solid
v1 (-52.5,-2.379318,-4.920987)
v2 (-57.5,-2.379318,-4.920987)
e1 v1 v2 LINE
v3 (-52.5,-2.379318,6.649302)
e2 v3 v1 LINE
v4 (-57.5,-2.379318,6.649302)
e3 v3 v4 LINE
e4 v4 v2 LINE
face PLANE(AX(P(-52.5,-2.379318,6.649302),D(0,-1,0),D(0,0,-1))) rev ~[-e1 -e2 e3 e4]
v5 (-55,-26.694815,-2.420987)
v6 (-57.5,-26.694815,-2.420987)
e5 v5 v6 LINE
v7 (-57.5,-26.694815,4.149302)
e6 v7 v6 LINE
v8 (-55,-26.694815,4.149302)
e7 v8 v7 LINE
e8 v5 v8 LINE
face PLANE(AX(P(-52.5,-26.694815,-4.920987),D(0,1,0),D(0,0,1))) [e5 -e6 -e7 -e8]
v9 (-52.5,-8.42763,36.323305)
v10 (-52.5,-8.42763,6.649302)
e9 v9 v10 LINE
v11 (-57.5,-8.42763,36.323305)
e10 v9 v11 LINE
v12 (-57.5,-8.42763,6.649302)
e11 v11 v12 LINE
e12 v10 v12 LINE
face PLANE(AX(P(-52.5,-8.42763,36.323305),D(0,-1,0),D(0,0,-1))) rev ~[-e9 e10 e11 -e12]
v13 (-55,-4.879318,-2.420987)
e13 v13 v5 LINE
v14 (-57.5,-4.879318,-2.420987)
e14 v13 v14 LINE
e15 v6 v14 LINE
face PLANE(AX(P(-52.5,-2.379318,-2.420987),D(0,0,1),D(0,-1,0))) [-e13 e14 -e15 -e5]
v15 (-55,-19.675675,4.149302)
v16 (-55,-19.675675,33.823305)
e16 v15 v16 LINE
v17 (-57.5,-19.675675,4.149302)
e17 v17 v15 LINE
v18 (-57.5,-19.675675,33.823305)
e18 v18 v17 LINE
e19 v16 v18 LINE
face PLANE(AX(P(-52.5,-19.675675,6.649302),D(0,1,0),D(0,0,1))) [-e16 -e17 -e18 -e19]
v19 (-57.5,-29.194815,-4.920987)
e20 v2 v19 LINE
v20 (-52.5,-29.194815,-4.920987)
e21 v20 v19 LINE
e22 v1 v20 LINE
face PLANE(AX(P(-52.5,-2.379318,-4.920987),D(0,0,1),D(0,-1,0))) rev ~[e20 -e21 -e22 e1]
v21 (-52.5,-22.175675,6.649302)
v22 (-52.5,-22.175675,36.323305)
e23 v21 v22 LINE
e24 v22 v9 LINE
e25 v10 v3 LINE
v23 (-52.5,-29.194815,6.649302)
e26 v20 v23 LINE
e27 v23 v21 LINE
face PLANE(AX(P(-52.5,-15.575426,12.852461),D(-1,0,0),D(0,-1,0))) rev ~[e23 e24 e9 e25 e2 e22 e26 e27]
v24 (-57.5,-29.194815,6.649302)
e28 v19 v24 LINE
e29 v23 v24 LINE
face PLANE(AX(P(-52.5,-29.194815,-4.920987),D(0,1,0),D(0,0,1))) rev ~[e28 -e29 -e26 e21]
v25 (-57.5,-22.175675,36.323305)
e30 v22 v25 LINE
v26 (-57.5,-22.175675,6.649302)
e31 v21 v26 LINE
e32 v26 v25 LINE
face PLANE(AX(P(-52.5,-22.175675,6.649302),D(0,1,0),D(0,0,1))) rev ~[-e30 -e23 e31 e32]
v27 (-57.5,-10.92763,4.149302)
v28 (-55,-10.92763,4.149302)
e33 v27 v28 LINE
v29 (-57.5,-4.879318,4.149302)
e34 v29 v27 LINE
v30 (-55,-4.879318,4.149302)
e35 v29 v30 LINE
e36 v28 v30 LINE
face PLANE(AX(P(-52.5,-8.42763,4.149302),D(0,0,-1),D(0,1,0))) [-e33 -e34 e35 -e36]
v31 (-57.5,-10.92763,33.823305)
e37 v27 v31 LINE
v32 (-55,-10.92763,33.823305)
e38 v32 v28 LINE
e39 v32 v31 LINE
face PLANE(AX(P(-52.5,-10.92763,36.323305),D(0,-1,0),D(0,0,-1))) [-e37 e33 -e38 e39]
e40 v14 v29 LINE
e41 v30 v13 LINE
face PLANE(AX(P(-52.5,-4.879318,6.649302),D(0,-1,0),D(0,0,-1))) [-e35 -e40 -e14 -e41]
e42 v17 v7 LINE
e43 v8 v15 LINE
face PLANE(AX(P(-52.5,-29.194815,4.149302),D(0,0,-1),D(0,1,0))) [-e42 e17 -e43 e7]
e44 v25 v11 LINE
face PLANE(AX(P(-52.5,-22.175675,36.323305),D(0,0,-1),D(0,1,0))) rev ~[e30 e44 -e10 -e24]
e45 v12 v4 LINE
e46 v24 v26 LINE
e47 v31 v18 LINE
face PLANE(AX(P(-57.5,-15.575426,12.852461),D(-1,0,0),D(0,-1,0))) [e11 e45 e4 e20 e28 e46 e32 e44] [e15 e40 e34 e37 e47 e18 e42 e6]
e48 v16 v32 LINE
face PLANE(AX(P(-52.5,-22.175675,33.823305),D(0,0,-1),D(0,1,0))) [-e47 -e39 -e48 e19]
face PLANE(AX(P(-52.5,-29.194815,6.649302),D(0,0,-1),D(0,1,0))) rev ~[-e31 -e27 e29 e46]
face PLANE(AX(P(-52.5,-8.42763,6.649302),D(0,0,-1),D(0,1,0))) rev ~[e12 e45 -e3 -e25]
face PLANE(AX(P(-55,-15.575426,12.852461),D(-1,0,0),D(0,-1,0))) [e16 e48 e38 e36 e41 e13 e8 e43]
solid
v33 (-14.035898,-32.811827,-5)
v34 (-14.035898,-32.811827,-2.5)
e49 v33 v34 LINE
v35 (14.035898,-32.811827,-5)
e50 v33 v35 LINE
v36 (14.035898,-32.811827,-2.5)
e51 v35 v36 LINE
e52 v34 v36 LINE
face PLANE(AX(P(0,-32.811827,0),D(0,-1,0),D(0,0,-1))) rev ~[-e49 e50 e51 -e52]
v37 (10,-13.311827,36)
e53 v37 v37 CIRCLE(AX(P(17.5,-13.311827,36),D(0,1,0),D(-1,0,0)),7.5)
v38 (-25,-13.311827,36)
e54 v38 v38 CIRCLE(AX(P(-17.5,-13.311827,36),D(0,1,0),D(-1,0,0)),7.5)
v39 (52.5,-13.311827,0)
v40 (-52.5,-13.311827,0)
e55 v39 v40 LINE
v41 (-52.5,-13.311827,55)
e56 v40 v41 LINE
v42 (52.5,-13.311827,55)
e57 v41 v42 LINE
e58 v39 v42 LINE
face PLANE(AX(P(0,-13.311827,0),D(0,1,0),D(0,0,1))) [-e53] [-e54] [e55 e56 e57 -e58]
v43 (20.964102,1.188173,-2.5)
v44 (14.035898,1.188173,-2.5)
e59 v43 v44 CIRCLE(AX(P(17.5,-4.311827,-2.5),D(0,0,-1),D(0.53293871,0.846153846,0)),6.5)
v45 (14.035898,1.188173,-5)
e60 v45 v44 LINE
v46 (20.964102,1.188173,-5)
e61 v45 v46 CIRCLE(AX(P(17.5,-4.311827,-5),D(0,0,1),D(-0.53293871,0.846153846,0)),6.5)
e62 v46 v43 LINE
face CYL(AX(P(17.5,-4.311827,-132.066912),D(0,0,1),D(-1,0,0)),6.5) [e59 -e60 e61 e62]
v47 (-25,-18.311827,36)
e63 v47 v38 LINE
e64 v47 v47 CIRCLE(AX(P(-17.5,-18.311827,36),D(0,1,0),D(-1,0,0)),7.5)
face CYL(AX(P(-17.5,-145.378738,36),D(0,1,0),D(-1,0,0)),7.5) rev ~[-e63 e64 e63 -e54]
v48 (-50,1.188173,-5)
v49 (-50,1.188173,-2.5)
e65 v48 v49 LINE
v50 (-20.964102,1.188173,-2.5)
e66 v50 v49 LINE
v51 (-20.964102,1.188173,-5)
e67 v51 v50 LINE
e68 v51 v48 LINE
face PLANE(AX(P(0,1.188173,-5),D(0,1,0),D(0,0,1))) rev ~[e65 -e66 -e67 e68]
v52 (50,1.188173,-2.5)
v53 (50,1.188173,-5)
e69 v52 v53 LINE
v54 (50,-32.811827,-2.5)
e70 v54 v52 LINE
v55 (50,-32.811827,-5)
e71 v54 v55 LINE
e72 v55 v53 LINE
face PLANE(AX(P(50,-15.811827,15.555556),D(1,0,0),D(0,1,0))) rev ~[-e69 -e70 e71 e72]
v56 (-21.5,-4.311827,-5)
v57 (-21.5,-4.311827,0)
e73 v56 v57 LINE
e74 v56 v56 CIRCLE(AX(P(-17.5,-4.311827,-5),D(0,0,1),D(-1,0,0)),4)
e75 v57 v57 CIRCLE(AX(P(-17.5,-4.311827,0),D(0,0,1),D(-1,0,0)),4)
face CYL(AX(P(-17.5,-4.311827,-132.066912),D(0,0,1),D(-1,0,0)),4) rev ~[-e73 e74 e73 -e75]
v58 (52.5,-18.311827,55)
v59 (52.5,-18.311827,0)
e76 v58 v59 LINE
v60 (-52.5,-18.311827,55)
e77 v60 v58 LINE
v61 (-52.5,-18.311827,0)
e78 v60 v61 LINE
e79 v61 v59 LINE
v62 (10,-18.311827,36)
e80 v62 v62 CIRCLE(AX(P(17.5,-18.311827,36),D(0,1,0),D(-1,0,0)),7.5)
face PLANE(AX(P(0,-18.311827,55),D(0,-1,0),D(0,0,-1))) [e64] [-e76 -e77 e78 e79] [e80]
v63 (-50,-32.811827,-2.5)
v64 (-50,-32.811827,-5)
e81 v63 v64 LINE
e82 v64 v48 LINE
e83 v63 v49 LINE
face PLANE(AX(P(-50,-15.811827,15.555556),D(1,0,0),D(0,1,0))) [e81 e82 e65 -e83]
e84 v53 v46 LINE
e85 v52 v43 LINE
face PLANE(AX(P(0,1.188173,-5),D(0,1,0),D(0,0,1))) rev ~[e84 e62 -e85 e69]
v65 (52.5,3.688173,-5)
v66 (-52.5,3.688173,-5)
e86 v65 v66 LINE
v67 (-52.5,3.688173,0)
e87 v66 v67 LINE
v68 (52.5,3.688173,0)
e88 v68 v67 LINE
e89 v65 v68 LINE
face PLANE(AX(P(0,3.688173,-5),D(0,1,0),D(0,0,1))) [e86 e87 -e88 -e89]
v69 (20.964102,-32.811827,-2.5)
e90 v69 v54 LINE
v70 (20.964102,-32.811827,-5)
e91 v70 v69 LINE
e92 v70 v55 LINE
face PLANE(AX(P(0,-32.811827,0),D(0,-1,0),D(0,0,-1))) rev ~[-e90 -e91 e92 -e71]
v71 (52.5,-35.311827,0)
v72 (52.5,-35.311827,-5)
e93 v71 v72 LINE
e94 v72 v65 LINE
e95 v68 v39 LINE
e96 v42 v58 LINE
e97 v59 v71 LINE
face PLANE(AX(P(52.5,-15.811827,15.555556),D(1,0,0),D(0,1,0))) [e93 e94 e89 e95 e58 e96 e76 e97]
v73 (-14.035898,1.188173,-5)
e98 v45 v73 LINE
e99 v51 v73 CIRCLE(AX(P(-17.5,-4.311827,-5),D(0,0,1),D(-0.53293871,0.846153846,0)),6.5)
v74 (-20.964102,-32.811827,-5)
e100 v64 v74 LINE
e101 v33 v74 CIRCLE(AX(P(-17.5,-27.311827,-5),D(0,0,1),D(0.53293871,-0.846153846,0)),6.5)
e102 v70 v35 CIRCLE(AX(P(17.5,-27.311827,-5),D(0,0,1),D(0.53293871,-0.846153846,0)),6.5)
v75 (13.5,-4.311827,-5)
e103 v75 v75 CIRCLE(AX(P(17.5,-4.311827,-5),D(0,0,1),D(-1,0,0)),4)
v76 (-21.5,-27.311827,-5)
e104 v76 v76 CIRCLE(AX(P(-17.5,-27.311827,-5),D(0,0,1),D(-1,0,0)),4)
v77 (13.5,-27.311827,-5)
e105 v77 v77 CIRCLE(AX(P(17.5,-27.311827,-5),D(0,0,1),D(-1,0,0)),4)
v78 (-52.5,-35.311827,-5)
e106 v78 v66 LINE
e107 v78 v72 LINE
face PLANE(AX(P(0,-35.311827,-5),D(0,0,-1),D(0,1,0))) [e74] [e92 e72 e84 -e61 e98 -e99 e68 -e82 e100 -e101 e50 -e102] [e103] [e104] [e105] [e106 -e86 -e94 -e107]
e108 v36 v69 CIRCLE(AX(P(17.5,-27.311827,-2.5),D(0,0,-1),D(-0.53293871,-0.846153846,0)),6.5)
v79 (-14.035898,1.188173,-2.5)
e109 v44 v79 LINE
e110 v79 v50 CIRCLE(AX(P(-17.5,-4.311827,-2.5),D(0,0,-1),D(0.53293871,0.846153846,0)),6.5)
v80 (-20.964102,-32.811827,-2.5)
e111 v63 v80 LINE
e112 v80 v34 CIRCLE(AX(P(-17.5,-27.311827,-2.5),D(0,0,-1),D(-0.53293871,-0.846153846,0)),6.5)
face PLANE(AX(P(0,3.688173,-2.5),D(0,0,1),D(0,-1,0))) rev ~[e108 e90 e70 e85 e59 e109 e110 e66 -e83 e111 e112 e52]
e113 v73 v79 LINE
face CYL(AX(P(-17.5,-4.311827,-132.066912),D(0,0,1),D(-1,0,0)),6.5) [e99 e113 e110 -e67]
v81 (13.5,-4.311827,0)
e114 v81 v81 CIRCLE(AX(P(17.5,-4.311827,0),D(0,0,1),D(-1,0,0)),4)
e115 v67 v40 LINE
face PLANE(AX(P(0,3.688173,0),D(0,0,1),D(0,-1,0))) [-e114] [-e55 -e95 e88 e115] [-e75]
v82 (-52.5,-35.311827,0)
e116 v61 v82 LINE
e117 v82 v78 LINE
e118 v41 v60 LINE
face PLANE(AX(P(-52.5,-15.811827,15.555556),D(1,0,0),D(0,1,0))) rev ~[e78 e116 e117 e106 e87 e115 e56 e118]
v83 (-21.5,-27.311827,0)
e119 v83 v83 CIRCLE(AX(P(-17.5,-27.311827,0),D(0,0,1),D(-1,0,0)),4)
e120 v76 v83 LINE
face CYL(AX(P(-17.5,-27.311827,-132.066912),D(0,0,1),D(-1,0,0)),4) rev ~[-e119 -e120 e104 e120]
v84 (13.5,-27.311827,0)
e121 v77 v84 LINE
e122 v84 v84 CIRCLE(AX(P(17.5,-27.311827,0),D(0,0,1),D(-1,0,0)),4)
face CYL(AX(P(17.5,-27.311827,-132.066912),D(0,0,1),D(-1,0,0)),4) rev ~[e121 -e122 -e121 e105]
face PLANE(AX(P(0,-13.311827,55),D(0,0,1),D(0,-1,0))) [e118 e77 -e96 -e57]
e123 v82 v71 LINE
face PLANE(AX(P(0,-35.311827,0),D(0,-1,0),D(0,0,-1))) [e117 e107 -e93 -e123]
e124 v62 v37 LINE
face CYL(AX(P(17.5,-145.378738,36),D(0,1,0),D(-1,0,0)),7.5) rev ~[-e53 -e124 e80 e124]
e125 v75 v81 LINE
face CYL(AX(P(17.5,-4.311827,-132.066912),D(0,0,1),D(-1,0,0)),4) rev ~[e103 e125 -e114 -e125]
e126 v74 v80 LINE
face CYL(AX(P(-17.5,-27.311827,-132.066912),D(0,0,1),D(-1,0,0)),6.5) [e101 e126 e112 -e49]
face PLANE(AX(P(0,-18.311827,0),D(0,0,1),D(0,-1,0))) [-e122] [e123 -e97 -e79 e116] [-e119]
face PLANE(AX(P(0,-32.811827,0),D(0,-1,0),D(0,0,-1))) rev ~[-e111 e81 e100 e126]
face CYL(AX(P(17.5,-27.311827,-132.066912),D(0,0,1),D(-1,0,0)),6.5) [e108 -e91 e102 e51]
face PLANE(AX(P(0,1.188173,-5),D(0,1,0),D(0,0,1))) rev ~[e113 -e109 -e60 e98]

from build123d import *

# Parameters (mm, degrees)
F1_DEPTH     = 52.5
F3_D         = 8
F6_D         = 15
F8_DEPTH     = 5
F9_T         = -2.5
F10_T        = 2.5
F10_T3_DEPTH = 110


# Not quite as in the source:
# - a shell that OpenCascade refuses in one call is made with other operations: the cavity is built on its own and cut out


with BuildPart() as f1:
    # F0 (on Right) → F1 (new body, symmetric)
    with BuildSketch(Plane.YZ):
        Polygon((-13.3118266579, 0), (-13.3118266579, 55), (-18.3118266579, 55), (-18.3118266579, 0), (-35.3118266579, 0), (-35.3118266579, -5), (-13.3118266579, -5), (3.6881733421, -5), (3.6881733421, 0), align=None)
    extrude(amount=F1_DEPTH, both=True)

    # F3 (through all)
    with Locations(Plane(origin=(0, 0, -5), x_dir=(1, 0, 0), z_dir=(0, 0, -1))):
        with Locations((-17.5, 27.3118266579), (17.5, 27.3118266579), (-17.5, 4.3118266579), (17.5, 4.3118266579)):
            Hole(F3_D / 2)

    # F6 (through all)
    with Locations(Plane.XZ.offset(18.3118266579)):
        with Locations((17.5, 36), (-17.5, 36)):
            Hole(F6_D / 2)

    # F10: shell of thickness 2.5, made by hand


with BuildPart() as f8:
    # F7 (on offset) → F8 (new body)
    with BuildSketch(Plane(origin=(-52.5, 0, 0), x_dir=(0, -1, 0), z_dir=(-1, 0, 0))):
        Polygon((2.3793176152, 6.649301853), (2.3793176152, -4.9209868232), (29.1948146988, -4.9209868232), (29.1948146988, 6.649301853), (22.175675258, 6.649301853), (22.175675258, 36.3233052194), (8.4276301786, 36.3233052194), (8.4276301786, 6.649301853), align=None)
    extrude(amount=F8_DEPTH)

    # F9
    f9_openings = [f8.faces().sort_by_distance(p)[0] for p in [
        (-57.5, -15.511345, 12.577798),
    ]]
    offset(amount=F9_T, openings=f9_openings, kind=Kind.INTERSECTION)


with BuildPart() as f10_core1:
    # F10_t2: copy of F1
    add(f1.part)

    # the walls: a layer under each face that stays
    f10_faces = [f10_core1.faces().sort_by_distance(p)[0] for p in [
        (0, -4.8118266579, 0),
        (-52.5, -15.8118266579, 25),
        (0, 3.6881733421, -2.5),
        (0, -13.3118266579, 27.5),
        (52.5, -15.8118266579, 25),
        (-21.5, -4.3118266579, -2.5),
        (13.5, -4.3118266579, -2.5),
        (0, -15.8118266579, 55),
        (0, -18.3118266579, 27.5),
        (0, -26.8118266579, 0),
        (0, -35.3118266579, -2.5),
        (-25, -15.8118266579, 36),
        (10, -15.8118266579, 36),
        (-21.5, -27.3118266579, -2.5),
        (13.5, -27.3118266579, -2.5),
    ]]
    thicken(f10_faces, amount=-F10_T, mode=Mode.SUBTRACT)

    # F10_s4 → F10_t3 (cut)
    with BuildSketch(Plane.YZ.offset(-55)):
        Polygon((-13.2868266579, 0.025), (-13.3118266579, -2.5), (-15.8118266579, -2.5), (-15.8118266579, 0), align=None)
        Polygon((-18.3368266579, 0.025), (-15.8118266579, 0), (-15.8118266579, -2.5), (-18.3118266579, -2.5), align=None)
    extrude(amount=F10_T3_DEPTH, mode=Mode.SUBTRACT)


with BuildPart() as f1_1:
    add(f1.part)

    # what is left inside the walls is the cavity
    f10_cavity = [f10_core1.part.solids().sort_by_distance(p)[0] for p in [
        (-16.666667, -15.811827, -4.975),
    ]]
    add(f10_cavity, mode=Mode.SUBTRACT)


solid = Compound([f8.part, f1_1.part])
